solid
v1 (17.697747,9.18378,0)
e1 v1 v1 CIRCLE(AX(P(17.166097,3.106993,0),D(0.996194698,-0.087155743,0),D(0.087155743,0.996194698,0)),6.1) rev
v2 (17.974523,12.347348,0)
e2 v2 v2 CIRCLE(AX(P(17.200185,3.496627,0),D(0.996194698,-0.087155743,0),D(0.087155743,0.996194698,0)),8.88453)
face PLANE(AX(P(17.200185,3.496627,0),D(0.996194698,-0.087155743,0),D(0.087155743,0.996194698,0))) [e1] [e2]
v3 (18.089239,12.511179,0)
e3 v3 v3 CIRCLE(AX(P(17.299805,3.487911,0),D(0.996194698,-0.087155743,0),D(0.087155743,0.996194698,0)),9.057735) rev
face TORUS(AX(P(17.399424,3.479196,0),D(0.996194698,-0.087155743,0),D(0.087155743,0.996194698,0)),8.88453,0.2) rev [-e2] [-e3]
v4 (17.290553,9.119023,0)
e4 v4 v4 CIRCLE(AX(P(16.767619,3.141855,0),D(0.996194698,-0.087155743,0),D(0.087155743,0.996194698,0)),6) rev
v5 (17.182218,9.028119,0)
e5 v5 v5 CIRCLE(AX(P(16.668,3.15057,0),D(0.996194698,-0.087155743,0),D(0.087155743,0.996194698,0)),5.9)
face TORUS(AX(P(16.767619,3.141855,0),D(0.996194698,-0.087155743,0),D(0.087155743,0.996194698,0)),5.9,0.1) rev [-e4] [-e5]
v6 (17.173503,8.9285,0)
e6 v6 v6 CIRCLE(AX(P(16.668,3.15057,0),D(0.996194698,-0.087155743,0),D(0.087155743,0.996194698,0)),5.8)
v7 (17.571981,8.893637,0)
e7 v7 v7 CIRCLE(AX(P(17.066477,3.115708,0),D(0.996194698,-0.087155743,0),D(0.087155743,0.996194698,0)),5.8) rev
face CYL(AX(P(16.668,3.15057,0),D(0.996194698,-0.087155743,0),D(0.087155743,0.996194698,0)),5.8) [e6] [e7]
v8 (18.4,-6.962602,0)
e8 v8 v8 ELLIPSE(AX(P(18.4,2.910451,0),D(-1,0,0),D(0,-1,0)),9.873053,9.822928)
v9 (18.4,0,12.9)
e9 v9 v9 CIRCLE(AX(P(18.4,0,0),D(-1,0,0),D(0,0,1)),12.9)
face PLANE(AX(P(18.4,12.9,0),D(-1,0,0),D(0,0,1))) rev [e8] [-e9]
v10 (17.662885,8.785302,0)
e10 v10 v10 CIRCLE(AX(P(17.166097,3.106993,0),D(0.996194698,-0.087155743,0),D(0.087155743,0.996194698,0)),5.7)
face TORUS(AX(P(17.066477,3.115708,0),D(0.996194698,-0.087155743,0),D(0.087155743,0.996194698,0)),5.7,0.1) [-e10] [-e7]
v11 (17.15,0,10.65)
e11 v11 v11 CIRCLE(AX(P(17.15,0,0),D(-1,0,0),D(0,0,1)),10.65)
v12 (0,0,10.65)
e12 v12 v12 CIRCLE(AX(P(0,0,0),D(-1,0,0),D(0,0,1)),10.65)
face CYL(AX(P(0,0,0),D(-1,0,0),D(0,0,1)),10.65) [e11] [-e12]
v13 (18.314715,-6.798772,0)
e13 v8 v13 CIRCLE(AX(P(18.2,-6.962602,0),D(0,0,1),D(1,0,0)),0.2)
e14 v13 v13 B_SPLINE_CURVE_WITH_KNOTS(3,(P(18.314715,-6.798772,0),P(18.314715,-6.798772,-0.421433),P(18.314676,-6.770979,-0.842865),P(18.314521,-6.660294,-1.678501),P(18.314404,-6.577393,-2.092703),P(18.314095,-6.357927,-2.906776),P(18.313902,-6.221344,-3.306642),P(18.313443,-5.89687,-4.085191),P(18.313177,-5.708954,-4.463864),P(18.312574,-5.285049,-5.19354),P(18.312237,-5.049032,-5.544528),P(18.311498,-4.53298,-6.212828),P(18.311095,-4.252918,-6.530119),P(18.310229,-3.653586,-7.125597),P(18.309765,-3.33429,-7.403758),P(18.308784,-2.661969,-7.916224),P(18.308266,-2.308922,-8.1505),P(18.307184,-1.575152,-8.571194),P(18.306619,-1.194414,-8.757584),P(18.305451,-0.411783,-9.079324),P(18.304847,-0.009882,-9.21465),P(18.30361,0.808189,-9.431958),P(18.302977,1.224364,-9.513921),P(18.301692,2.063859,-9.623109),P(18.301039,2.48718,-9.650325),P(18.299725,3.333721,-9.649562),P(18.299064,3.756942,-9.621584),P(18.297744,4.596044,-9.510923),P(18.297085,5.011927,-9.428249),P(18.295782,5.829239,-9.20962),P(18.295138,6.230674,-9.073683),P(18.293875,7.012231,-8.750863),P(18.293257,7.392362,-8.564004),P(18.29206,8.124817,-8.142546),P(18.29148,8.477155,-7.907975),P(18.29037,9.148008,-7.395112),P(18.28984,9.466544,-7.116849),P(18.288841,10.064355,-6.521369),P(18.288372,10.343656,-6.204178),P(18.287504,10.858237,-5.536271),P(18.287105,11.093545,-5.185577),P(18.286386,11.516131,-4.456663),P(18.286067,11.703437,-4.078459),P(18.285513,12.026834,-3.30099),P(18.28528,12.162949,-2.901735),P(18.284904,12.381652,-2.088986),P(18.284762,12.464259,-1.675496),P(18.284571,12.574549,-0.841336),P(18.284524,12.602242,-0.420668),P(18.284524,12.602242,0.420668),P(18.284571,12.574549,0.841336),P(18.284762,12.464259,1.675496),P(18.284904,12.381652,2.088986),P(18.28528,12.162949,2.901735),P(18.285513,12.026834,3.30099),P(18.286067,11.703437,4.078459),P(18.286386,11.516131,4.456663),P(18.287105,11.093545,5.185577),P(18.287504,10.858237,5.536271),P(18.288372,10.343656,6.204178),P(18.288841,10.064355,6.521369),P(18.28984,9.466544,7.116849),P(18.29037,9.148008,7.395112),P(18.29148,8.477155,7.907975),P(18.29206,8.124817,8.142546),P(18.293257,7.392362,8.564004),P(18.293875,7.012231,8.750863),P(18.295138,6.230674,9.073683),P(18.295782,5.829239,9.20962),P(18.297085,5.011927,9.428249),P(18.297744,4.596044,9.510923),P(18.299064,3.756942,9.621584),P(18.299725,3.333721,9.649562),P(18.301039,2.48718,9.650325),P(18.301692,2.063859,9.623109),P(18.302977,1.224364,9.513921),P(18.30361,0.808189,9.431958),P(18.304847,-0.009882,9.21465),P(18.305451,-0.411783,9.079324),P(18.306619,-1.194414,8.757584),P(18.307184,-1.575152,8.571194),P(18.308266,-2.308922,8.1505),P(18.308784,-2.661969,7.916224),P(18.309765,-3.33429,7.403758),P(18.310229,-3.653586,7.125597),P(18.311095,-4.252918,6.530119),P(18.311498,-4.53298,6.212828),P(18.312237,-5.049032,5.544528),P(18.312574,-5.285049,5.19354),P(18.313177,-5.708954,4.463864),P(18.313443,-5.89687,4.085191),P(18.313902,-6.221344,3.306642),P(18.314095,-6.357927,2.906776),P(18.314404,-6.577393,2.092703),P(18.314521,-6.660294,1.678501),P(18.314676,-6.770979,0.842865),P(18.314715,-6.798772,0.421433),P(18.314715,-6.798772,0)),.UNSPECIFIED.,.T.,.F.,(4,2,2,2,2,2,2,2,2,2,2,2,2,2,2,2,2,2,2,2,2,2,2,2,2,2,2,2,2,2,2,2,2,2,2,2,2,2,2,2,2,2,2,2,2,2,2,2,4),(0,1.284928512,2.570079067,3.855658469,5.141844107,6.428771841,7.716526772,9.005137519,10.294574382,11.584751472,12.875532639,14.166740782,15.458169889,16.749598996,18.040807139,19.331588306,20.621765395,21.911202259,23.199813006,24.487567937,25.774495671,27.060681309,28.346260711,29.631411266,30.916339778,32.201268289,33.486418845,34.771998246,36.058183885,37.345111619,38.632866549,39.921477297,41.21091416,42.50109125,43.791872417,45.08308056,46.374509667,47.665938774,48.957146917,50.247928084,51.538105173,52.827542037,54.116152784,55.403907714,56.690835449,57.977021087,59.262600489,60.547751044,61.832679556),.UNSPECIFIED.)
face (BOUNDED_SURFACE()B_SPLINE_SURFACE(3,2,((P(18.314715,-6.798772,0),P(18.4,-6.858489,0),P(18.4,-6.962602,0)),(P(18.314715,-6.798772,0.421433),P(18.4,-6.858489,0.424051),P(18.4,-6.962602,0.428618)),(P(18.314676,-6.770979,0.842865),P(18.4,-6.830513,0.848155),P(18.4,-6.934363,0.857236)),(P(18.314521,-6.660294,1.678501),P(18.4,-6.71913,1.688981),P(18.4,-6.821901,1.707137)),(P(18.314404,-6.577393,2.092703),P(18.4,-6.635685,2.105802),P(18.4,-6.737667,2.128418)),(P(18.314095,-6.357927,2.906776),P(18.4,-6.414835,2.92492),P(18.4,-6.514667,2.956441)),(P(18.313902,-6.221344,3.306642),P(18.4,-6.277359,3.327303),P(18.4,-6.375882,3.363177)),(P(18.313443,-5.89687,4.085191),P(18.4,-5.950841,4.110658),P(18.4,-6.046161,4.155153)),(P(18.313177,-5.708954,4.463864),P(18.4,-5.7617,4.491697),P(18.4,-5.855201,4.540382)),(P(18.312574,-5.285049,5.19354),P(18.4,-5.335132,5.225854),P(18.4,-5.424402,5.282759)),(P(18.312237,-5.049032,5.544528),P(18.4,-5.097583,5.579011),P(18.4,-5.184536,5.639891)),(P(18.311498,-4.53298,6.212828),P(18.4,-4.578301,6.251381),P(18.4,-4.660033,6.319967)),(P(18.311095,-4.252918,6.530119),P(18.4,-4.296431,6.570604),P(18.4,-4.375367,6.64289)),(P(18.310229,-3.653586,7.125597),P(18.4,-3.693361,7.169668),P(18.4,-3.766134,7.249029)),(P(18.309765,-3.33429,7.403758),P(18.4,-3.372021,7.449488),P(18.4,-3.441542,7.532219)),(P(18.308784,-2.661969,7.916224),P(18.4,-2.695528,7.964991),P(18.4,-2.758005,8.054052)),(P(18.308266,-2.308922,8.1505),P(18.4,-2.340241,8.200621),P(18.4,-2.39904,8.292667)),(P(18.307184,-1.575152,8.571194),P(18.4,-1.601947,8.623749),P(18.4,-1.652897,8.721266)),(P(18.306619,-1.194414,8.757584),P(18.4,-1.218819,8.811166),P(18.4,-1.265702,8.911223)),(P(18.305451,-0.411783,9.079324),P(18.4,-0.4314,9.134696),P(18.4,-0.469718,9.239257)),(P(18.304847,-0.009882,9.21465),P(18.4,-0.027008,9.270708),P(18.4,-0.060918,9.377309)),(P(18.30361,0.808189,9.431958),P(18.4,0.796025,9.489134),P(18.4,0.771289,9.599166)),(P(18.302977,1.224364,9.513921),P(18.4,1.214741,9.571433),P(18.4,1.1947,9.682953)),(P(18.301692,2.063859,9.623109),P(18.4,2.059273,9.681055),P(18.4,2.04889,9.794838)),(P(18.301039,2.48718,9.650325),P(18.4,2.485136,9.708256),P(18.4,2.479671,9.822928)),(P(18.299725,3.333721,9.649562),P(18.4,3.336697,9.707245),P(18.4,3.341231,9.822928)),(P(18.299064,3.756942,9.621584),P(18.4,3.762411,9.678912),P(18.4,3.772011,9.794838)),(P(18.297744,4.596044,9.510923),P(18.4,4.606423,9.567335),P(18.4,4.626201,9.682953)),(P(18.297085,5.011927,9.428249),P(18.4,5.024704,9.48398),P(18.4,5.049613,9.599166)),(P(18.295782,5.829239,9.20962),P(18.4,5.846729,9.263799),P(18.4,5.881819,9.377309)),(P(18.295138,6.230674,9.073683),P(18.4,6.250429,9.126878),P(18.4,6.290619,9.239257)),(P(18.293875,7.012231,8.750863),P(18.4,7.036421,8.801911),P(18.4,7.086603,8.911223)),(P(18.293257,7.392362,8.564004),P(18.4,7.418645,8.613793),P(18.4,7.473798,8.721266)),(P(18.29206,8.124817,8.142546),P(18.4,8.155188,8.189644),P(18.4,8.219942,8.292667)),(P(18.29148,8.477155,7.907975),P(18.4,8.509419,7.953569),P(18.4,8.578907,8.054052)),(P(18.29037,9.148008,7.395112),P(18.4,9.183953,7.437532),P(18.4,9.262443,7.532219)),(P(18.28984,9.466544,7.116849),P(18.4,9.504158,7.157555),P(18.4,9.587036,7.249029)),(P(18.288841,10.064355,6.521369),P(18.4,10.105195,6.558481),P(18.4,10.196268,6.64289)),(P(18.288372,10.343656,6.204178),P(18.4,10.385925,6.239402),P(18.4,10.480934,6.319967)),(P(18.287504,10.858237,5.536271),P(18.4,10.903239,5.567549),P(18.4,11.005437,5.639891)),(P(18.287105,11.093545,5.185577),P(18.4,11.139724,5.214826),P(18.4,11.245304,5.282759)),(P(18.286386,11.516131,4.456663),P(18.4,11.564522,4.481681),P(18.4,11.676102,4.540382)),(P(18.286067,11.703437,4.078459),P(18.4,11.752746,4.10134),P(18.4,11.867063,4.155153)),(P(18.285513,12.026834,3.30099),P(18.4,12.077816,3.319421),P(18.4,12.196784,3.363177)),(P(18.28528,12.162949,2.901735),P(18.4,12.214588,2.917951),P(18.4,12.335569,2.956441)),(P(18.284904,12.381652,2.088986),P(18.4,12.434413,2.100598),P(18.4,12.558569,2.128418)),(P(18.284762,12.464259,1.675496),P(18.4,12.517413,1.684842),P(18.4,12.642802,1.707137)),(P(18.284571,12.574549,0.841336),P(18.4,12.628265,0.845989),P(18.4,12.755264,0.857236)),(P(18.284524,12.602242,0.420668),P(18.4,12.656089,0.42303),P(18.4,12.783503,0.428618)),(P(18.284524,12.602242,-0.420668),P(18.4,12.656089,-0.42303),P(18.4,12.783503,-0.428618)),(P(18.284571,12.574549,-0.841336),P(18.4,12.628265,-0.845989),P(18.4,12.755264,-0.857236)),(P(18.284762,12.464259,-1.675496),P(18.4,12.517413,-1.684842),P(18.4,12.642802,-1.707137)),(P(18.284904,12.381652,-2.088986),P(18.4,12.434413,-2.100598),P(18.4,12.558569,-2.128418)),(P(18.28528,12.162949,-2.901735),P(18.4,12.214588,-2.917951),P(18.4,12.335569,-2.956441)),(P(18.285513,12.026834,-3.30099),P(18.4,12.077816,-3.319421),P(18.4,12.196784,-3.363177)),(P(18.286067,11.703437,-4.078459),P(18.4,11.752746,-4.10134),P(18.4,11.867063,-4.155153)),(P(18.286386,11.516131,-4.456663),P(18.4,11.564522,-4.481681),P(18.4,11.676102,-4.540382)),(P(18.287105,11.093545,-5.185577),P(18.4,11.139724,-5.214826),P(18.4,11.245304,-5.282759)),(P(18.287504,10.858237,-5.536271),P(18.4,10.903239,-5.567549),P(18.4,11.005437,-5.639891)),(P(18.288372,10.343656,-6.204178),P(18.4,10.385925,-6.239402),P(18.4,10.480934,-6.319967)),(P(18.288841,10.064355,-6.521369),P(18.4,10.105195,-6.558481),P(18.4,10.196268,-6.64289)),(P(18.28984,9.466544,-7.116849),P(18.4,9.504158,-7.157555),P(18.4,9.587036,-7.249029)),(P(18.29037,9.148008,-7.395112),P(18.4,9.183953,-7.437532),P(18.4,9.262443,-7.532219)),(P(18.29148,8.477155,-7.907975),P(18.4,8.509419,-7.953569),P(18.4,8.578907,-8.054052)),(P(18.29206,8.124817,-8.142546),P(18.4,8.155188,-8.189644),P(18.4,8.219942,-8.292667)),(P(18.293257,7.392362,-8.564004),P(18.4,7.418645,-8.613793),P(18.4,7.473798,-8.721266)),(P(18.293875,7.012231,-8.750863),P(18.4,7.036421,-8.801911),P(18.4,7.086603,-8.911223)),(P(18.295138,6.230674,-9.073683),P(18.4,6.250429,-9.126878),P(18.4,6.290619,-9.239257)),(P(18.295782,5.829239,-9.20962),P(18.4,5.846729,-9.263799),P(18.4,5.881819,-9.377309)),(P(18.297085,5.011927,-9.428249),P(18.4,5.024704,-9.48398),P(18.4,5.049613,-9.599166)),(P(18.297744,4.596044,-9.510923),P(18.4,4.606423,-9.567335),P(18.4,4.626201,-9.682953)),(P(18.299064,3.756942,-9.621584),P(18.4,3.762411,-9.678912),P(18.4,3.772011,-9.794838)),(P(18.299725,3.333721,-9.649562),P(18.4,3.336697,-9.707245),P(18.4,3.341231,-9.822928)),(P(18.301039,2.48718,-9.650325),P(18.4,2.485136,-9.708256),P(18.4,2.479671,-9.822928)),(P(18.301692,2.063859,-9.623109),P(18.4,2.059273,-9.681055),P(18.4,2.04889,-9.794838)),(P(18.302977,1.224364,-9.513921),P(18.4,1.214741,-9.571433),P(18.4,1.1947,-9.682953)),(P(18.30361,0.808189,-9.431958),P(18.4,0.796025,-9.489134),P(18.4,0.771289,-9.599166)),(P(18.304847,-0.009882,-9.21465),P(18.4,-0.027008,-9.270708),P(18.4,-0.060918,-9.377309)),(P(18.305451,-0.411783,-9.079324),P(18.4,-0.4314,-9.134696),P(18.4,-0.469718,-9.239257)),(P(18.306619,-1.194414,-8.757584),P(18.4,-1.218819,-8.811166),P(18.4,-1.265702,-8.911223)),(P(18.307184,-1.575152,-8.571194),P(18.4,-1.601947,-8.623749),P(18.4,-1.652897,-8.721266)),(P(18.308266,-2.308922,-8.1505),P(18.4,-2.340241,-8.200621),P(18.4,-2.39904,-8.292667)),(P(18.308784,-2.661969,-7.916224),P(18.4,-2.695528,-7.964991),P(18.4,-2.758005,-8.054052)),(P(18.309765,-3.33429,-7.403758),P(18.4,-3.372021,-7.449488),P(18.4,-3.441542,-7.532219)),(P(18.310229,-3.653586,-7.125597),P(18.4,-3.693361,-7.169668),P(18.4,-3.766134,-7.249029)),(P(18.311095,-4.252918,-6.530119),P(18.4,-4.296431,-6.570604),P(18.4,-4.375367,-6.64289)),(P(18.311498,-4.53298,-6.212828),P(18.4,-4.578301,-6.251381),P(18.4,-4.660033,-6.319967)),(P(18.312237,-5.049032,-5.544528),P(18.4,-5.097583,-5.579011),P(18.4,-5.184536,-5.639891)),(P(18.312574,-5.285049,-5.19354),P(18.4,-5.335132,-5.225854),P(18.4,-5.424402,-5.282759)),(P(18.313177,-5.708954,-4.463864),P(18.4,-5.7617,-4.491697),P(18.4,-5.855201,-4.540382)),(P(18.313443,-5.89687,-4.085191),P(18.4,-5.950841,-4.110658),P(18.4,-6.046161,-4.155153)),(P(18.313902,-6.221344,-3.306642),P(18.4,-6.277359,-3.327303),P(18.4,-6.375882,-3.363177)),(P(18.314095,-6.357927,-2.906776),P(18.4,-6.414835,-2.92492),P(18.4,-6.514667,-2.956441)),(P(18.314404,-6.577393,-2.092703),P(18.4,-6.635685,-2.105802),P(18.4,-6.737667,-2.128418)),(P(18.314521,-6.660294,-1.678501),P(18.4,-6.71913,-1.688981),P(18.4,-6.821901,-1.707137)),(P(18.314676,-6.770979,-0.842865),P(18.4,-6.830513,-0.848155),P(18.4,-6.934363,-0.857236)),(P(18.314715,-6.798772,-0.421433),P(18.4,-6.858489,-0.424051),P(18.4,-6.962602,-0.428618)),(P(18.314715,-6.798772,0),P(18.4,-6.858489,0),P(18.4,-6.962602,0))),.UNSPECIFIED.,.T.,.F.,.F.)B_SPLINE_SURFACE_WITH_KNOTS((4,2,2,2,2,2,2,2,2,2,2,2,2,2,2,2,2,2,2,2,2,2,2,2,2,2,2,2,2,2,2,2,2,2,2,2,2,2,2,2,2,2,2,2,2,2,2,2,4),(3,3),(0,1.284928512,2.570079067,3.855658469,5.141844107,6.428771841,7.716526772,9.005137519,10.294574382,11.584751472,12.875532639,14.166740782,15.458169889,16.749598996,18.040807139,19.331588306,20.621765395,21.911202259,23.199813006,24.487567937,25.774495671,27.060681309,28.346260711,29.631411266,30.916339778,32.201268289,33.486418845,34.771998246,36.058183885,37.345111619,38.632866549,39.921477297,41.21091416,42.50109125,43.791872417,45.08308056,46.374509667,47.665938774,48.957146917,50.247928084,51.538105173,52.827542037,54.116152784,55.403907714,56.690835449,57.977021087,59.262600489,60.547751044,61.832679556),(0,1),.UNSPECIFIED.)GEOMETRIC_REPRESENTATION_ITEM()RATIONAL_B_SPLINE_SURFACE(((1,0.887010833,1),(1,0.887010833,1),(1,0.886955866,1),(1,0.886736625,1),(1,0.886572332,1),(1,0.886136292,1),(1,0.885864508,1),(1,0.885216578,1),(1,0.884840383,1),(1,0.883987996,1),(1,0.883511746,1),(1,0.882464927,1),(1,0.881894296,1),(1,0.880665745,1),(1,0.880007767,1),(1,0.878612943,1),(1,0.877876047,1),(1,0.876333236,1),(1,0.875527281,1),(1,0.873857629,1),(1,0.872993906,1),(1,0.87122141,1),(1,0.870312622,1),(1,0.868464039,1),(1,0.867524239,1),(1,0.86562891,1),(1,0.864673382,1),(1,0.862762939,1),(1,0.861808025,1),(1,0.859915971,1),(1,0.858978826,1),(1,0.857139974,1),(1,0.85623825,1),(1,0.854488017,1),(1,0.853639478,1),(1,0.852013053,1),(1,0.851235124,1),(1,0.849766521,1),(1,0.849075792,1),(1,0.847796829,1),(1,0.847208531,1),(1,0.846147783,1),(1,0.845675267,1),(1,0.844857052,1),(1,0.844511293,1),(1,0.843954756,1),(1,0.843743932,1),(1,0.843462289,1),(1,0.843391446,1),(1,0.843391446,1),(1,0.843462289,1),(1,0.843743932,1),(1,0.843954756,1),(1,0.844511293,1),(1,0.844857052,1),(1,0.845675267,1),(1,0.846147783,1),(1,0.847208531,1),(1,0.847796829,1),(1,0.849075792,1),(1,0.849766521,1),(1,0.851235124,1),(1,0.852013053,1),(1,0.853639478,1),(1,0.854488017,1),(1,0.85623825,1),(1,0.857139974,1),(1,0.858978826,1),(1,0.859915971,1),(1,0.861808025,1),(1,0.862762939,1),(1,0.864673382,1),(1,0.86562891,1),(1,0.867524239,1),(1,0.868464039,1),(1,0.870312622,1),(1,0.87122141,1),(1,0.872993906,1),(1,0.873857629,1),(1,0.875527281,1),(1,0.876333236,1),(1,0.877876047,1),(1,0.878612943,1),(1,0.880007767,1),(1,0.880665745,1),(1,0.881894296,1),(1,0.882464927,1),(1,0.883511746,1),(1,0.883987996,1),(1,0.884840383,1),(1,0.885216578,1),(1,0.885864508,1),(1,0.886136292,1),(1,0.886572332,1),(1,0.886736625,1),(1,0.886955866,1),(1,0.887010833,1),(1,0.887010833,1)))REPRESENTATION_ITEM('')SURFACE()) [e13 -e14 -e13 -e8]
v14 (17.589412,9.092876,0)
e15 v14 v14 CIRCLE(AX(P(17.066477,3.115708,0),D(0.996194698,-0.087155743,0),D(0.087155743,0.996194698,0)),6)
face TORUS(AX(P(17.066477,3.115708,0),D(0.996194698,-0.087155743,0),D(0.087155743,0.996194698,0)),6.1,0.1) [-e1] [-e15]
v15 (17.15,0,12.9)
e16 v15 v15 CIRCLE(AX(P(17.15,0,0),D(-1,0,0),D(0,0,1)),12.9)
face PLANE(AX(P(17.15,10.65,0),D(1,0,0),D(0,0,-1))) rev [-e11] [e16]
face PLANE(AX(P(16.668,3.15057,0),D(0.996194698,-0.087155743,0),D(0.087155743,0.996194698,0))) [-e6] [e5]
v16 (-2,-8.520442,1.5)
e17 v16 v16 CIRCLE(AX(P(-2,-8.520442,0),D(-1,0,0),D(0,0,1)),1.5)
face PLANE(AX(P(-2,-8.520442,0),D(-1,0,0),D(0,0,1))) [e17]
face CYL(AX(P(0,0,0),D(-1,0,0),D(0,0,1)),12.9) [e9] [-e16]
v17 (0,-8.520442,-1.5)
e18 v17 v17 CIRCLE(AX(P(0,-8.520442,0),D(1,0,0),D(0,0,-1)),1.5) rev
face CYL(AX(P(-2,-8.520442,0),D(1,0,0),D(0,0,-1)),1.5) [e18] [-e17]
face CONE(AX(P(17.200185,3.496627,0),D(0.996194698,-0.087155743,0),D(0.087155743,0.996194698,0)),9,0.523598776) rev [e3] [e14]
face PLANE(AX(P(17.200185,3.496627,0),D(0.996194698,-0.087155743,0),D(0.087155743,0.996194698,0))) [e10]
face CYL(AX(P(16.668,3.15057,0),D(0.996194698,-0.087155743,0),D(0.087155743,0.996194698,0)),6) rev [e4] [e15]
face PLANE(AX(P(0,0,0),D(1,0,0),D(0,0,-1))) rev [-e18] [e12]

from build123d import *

# Parameters (mm, degrees)
CUT_EXTRUDE_1_DEPTH      = 27.64630158
CUT_EXTRUDE_1_DEPTH_BACK = 1.5
SKETCH_2_R               = 9
FILLET_1_R               = 0.2
SKETCH_3_R               = 6
SKETCH_3_R_2             = 5.8
CUT_EXTRUDE_2_DEPTH      = 0.5
FILLET_2_R               = 0.1
SKETCH_4_R               = 1.5
EXTRUDE_1_DEPTH          = 2


# Read off the part's stored shape, not the designer's step: Уклон1
with BuildPart() as part:
    # Эскиз1 → Повернуть1 (revolve)
    with BuildSketch(Plane.XY, mode=Mode.PRIVATE) as revolve_1_sk:
        Polygon((0, 0), (0, 10.65), (17.15, 10.65), (17.15, 12.9), (18.4, 12.9), (18.4, 0), align=None)
    revolve(revolve_1_sk.sketch.rotate(Axis((0, 0, 0), (1, 0, 0)), 90), axis=Axis((0, 0, 0), (1, 0, 0)))

    # Эскиз2 → Вырез-Вытянуть1 (cut, two sides: drawn at the far end of the back side and taken through both)
    with BuildSketch(Plane(origin=(18.260231328, -1.597563235, 0), x_dir=(0, 0, -1), z_dir=(0.9961946980917455, -0.08715574274765836, 0)).offset(-CUT_EXTRUDE_1_DEPTH_BACK)):
        with Locations(Location((0, 4.982416031, 0), (0, 0, 90))):
            Circle(SKETCH_2_R)
    extrude(amount=CUT_EXTRUDE_1_DEPTH + CUT_EXTRUDE_1_DEPTH_BACK, mode=Mode.SUBTRACT)

    # Уклон1 outline → Уклон1 (revolve, cut)
    with BuildSketch(Plane(origin=(0.43424617, 4.963456434, 0), x_dir=(0.08715574274765836, 0.9961946980917454, 0), z_dir=(0, 0, -1))):
        Polygon((9, 16.829982445), (10.211394412, 18.928179115), (9, 18.928179115), align=None)
    revolve(axis=Axis((0.43424617, 4.963456434, 0), (0.9961946980917454, -0.08715574274765836, 0)), mode=Mode.SUBTRACT)

    # Скругление1
    fillet_1_edges = [part.edges().sort_by_distance(p)[0] for p in [
        (16.415783766, -5.469125469, 0),
        (18.4, -6.858488634, -5.8e-08),
    ]]
    fillet(fillet_1_edges, radius=FILLET_1_R)

    # Эскиз3 → Вырез-Вытянуть2 (cut)
    with BuildSketch(Plane(origin=(16.765939281, -1.46682962, 0), x_dir=(0, 0, -1), z_dir=(0.9961946980917457, -0.08715574274765837, 0))):
        with Locations(Location((0, 4.591293403, 0), (0, 0, 90))):
            Circle(SKETCH_3_R)
        with Locations(Location((0, 4.591293403, 0), (0, 0, 90))):
            Circle(SKETCH_3_R_2, mode=Mode.SUBTRACT)
    extrude(amount=-CUT_EXTRUDE_2_DEPTH, mode=Mode.SUBTRACT)

    # Скругление2
    fillet_2_edges = [part.edges().sort_by_distance(p)[0] for p in [
        (16.145065062, -2.826597792, 0),
        (16.643162411, -2.870175664, 0),
        (16.660593559, -2.670936724, 0),
    ]]
    fillet(fillet_2_edges, radius=FILLET_2_R)

    # Эскиз4 → Бобышка-Вытянуть1 (add)
    with BuildSketch(Plane.ZY):
        with Locations(Location((0, -8.520441642, 0), (0, 0, 180))):
            Circle(SKETCH_4_R)
    extrude(amount=EXTRUDE_1_DEPTH)


solid = part.part
